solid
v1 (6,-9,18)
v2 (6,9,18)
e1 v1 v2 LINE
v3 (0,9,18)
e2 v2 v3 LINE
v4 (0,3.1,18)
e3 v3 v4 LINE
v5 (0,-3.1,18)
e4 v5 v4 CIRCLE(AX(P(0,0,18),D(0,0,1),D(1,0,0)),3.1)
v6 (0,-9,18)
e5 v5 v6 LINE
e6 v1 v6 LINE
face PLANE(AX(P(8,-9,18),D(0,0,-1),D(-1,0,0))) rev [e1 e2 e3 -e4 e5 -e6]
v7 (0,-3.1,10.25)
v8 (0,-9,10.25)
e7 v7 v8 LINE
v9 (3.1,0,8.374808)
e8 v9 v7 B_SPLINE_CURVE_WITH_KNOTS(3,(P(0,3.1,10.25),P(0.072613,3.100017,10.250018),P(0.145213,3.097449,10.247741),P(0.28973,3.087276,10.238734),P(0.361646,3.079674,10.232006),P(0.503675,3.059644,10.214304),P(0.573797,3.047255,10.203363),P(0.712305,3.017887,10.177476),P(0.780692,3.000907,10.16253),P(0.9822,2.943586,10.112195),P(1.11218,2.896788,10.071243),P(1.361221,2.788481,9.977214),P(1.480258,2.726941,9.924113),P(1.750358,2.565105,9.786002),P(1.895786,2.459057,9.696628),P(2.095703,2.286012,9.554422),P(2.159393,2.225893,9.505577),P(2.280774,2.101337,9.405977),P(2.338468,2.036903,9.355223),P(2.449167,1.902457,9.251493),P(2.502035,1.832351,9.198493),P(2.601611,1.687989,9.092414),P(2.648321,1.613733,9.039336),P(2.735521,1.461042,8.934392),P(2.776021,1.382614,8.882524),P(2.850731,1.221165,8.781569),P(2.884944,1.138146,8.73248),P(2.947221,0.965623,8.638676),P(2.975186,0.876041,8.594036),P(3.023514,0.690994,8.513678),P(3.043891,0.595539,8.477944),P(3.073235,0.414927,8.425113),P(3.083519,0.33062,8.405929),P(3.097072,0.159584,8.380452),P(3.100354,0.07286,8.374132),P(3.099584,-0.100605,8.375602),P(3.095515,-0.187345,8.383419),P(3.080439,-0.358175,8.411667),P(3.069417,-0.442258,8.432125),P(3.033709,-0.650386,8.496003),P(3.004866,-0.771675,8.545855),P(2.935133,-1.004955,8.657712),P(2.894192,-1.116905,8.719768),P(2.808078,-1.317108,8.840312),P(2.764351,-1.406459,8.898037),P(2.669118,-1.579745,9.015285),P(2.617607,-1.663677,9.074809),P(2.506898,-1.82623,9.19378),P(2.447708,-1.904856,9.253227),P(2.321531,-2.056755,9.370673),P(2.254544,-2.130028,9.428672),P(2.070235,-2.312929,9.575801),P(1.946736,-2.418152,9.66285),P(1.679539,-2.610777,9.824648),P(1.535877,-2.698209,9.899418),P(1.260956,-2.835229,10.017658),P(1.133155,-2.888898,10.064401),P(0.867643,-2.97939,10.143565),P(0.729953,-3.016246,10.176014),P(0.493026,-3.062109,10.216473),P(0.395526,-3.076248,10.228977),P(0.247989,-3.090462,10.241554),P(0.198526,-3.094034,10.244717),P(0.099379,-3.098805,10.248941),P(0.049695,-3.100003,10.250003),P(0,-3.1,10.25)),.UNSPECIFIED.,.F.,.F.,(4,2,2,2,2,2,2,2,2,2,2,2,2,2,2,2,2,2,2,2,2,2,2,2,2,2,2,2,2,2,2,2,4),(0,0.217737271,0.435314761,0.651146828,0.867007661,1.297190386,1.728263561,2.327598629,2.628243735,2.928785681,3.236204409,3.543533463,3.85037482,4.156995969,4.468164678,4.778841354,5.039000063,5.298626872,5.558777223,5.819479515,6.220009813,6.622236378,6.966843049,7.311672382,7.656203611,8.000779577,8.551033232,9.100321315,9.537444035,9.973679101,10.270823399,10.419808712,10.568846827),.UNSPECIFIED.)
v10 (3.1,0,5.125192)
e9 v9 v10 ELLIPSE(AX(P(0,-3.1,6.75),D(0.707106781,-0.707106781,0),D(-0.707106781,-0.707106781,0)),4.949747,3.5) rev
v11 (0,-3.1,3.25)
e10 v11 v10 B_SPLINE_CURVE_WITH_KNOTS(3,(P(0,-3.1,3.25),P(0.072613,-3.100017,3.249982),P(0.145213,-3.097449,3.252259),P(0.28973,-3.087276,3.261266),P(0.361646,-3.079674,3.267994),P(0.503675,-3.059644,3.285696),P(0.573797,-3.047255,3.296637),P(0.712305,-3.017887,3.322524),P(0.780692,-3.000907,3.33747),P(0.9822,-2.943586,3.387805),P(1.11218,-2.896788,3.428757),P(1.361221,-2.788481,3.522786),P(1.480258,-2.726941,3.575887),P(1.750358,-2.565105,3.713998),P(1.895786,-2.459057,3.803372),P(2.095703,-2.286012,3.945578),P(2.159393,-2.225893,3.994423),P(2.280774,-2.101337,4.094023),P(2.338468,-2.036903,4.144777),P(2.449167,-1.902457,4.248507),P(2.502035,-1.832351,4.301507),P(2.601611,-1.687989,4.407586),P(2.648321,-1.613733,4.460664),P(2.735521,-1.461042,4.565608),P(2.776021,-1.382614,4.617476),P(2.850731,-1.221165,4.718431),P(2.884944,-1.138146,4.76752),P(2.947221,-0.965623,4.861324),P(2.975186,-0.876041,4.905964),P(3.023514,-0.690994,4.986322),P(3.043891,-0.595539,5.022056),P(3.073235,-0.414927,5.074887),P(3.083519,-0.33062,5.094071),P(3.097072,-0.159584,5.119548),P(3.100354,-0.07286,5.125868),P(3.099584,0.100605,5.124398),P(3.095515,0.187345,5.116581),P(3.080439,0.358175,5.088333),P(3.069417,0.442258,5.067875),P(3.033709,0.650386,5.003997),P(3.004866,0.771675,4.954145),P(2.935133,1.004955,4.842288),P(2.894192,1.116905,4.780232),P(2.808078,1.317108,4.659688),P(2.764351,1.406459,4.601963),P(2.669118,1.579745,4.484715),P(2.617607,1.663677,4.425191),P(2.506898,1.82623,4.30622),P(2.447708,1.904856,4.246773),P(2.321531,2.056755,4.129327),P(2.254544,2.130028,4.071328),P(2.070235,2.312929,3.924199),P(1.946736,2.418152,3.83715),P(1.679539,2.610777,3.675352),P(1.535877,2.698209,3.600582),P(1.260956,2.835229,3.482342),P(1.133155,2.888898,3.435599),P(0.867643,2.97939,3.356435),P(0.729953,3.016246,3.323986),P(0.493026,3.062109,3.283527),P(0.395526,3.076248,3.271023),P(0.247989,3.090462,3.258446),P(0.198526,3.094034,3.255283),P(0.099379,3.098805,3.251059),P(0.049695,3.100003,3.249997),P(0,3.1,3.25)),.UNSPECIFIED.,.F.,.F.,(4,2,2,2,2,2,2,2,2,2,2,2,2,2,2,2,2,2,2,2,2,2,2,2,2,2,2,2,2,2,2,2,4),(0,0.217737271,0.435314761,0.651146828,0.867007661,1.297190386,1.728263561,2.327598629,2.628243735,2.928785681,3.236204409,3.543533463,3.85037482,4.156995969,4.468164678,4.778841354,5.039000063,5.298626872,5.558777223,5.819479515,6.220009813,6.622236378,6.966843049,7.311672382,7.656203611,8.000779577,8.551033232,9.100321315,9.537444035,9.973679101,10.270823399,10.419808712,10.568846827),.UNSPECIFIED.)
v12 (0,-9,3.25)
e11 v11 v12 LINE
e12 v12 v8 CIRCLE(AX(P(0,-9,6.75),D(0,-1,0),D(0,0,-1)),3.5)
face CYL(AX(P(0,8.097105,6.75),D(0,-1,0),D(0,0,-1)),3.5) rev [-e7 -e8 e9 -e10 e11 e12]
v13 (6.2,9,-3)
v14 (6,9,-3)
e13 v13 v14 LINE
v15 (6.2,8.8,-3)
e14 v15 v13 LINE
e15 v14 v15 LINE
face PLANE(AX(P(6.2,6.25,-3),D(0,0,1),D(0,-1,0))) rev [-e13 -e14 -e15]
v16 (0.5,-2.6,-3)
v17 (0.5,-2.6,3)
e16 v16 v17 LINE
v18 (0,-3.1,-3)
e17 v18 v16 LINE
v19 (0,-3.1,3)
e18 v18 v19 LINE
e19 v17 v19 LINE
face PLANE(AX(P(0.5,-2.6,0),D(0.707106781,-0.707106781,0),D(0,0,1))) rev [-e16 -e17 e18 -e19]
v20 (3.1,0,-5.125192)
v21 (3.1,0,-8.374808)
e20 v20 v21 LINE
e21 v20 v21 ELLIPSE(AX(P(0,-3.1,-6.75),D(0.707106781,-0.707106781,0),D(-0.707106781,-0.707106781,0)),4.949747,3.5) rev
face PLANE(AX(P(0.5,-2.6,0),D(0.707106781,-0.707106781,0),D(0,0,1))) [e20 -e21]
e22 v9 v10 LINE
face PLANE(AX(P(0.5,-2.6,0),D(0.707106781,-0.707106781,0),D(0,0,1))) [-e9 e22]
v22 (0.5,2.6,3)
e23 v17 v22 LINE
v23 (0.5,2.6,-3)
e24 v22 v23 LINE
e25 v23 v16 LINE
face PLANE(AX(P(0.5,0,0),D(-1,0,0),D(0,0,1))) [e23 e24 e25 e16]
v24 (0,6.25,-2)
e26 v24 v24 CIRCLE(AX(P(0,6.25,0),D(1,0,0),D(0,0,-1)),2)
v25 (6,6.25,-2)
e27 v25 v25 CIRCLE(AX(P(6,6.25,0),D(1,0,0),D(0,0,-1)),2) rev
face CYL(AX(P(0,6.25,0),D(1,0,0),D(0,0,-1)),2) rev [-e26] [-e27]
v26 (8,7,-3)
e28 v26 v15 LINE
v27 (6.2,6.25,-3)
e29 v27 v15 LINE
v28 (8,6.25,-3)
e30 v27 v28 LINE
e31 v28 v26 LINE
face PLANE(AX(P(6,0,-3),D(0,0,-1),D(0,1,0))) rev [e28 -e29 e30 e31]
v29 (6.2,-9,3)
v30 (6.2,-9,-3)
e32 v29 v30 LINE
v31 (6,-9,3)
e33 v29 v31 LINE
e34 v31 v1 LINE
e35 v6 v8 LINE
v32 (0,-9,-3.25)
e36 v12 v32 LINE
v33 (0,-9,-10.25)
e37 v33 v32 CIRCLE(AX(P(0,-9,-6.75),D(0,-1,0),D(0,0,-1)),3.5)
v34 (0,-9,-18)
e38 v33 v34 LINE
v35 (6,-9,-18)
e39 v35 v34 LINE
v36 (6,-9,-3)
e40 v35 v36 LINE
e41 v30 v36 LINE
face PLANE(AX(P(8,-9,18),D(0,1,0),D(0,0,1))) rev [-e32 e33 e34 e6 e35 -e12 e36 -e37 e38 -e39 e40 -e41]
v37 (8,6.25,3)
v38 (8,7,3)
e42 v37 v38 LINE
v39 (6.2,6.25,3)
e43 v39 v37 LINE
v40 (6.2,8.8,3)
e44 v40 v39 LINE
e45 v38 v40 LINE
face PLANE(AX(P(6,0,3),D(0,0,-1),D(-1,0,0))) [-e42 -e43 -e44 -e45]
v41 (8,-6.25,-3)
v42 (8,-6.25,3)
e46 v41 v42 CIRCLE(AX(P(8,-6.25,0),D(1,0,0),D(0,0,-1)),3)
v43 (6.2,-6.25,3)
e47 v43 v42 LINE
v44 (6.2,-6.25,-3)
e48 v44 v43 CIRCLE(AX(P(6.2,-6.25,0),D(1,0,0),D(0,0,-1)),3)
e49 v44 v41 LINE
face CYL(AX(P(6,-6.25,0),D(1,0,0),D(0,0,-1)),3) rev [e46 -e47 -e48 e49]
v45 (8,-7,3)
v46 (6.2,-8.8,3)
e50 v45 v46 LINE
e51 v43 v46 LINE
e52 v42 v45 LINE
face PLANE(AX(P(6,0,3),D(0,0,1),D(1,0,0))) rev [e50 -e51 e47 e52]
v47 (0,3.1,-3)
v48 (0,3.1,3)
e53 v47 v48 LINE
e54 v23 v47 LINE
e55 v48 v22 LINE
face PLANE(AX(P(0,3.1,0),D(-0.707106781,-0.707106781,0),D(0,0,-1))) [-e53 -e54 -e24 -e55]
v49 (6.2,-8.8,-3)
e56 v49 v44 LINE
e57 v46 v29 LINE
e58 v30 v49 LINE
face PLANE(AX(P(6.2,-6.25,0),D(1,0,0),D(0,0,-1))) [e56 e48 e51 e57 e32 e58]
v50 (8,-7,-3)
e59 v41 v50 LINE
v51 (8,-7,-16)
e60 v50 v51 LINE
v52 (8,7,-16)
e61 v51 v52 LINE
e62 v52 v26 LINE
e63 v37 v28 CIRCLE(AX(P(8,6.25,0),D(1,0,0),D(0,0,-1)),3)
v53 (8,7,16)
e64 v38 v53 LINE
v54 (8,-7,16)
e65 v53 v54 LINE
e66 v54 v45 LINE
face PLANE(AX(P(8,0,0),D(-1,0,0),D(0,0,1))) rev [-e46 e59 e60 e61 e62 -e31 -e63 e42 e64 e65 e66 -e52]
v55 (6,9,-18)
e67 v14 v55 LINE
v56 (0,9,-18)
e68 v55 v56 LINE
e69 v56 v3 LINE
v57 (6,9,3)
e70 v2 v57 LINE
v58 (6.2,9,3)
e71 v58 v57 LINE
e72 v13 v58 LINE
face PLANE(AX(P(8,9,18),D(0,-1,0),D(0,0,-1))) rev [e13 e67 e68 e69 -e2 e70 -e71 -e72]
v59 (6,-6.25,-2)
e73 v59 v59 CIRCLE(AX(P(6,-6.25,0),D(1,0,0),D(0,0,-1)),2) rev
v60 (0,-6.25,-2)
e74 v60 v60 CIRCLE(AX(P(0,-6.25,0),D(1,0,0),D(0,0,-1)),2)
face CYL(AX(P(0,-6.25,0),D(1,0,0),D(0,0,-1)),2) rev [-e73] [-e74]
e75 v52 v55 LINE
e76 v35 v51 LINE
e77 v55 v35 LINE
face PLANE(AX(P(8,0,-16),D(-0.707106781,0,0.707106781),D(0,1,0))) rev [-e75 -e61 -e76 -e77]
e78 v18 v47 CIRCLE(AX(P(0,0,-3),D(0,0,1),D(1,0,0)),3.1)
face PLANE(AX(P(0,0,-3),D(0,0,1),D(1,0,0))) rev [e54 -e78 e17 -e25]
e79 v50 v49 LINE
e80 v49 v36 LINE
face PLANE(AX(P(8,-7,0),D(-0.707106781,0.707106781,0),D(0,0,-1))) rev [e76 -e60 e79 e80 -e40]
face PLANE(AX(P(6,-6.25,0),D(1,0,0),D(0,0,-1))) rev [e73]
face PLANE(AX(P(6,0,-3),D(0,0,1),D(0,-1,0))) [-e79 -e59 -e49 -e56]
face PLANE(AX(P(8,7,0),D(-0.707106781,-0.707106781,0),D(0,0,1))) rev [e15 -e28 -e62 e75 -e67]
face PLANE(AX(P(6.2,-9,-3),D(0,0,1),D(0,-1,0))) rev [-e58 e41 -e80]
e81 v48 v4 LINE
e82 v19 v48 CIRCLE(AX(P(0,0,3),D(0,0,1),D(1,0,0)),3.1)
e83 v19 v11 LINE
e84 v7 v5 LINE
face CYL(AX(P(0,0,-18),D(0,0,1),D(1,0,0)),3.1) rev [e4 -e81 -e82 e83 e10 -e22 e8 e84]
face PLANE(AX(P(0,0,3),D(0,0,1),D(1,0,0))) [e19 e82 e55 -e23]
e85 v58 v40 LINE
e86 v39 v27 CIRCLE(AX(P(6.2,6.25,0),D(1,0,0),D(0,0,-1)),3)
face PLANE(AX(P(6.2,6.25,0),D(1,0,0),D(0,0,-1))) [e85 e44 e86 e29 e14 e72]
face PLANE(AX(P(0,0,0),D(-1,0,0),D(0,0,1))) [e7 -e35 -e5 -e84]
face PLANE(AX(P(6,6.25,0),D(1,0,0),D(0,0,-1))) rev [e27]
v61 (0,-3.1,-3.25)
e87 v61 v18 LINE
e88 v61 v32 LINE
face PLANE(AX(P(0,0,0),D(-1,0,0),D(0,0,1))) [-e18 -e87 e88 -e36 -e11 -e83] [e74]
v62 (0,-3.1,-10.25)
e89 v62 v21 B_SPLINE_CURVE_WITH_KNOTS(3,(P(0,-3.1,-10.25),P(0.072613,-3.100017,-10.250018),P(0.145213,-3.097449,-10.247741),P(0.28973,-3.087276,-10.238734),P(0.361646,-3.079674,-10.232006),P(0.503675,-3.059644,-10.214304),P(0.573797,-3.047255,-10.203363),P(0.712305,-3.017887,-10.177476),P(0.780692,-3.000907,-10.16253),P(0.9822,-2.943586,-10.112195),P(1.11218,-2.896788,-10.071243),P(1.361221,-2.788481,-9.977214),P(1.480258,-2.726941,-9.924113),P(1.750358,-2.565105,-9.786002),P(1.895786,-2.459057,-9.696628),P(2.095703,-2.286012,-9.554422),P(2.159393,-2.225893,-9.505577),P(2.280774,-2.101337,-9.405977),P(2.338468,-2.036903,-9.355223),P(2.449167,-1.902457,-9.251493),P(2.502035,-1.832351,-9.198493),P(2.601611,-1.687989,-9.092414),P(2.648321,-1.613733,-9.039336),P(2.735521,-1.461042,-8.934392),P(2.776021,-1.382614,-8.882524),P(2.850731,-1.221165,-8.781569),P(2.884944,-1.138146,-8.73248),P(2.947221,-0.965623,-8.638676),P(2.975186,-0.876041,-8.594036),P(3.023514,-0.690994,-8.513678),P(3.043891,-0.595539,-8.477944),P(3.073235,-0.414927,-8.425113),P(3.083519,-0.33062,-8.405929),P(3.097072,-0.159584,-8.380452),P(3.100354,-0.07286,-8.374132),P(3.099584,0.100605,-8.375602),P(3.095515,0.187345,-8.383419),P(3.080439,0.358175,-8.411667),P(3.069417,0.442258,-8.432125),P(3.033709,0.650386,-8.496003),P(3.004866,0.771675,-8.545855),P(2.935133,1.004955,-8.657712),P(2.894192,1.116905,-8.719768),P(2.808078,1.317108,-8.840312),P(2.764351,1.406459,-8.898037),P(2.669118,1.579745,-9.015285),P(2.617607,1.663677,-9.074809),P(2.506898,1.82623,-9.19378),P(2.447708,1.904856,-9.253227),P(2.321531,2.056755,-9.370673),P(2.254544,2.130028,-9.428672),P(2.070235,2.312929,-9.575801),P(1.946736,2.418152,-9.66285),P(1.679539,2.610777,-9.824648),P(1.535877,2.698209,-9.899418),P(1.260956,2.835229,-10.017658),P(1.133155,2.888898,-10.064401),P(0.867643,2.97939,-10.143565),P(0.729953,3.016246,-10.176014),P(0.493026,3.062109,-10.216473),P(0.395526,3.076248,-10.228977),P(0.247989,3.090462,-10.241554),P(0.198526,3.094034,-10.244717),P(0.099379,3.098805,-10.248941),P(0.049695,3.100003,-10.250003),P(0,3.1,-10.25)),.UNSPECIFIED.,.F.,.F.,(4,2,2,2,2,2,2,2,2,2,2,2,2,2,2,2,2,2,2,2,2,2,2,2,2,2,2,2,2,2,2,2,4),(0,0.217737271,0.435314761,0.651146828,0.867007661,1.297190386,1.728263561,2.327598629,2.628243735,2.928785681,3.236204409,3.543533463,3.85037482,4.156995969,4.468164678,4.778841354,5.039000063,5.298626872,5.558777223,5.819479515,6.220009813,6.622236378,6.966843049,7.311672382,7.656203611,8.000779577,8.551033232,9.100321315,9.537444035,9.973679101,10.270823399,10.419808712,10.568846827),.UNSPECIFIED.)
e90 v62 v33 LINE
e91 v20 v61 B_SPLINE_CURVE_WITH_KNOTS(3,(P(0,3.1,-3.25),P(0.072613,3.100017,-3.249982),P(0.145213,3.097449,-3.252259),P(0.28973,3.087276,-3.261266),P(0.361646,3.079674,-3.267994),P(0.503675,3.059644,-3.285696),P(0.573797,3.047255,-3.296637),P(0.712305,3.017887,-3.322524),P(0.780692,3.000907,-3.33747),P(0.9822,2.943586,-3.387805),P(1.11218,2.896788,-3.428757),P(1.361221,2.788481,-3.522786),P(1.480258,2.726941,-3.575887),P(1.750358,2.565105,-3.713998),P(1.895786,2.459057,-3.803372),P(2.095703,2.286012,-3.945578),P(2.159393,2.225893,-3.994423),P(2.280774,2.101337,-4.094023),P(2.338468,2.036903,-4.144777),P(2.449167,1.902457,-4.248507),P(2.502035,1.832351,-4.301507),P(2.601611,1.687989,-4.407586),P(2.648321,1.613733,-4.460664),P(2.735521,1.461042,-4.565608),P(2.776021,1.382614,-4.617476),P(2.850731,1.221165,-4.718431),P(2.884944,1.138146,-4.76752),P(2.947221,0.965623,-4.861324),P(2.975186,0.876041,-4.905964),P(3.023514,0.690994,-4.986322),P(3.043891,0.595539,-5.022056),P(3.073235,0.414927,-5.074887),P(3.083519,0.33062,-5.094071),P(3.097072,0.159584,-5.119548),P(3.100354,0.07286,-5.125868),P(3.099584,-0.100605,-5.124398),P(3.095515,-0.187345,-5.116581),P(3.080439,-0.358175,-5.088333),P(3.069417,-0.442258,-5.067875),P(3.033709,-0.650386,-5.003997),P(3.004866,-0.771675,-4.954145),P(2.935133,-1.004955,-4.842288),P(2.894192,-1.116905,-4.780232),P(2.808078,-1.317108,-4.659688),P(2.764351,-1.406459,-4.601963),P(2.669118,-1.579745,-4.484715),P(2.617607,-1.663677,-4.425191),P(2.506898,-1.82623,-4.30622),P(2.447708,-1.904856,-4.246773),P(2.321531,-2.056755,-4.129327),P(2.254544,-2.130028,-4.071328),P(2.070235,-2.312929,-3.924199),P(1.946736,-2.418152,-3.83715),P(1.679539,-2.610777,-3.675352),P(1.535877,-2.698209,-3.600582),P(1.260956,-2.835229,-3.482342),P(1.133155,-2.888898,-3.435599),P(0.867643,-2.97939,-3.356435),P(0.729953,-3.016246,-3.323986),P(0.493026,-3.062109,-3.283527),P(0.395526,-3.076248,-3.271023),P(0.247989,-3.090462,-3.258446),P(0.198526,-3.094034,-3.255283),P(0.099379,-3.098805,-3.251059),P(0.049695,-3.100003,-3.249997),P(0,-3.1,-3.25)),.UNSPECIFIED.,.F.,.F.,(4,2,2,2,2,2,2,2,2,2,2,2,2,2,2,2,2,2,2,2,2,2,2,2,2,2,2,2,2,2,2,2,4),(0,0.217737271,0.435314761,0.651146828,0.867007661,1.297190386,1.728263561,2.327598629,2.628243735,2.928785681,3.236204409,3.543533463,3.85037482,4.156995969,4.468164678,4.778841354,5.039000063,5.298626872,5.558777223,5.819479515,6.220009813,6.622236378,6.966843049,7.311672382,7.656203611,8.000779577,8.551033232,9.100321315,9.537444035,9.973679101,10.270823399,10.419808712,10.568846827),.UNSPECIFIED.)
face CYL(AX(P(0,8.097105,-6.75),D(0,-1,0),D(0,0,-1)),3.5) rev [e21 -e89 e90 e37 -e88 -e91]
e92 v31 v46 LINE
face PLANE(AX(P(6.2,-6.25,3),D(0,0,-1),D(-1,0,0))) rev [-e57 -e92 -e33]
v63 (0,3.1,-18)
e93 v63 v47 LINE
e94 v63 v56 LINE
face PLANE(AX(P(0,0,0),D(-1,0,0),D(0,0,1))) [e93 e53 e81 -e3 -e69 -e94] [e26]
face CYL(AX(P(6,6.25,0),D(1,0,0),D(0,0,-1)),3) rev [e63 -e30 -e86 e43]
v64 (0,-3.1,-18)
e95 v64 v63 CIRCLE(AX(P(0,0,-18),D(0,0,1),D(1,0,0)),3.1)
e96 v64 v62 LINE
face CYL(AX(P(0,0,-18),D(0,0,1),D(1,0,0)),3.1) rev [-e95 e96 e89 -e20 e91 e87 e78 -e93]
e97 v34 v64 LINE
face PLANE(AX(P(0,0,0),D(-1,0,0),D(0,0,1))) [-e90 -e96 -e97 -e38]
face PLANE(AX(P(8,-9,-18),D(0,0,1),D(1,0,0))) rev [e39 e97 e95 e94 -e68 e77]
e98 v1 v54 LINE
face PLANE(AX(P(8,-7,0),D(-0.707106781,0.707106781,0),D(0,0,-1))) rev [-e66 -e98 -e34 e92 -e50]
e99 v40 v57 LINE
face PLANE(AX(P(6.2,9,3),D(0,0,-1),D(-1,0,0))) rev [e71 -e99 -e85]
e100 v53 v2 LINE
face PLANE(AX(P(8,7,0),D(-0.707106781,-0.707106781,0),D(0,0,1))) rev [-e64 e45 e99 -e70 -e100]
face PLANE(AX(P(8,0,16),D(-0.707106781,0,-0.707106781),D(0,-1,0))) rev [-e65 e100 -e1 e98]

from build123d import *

# Parameters (mm, degrees)
SKETCH_1_W              = 36
SKETCH_1_H              = 18
EXTRUDE_1_DEPTH         = 8
CUT_EXTRUDE_1_DEPTH     = 38.960505792
CHAMFER_1_SIZE          = 2
CUT_EXTRUDE_2_DEPTH     = 22.656407828
CUT_EXTRUDE_START       = -2
CUT_EXTRUDE_3_OUTLINE_R = 2
CUT_EXTRUDE_3_DEPTH     = 2
EXTRUDE_2_DEPTH         = 0.2
EXTRUDE_3_DEPTH         = 3
SKETCH_7_W              = 6
SKETCH_7_H              = 6.2
CUT_EXTRUDE_4_DEPTH     = 0.5
CHAMFER_16_SIZE         = 0.5
CUT_EXTRUDE_5_REACH     = 28.683


# Read off the part's stored shape, not the designer's step: Вырез-Вытянуть3
with BuildPart() as part:
    # Эскиз1 → Бобышка-Вытянуть1 (new body)
    with BuildSketch(Plane(origin=(0, 0, 0), x_dir=(0, 0, -1), z_dir=(1, 0, 0))):
        Rectangle(SKETCH_1_W, SKETCH_1_H)
    extrude(amount=EXTRUDE_1_DEPTH)

    # Эскиз2 → Вырез-Вытянуть1 (cut, through all)
    with BuildSketch(Plane.XY.offset(18)):
        with BuildLine():
            ThreePointArc((0, -3.1), (3.1, 0), (0, 3.1))
            Line((0, 3.1), (0, -3.1))
        make_face()
    extrude(amount=-CUT_EXTRUDE_1_DEPTH, mode=Mode.SUBTRACT)

    # Фаска1
    chamfer_1_edges = [part.edges().sort_by_distance(p)[0] for p in [
        (8, 0, 18),
        (8, -9, 0),
        (8, 0, -18),
        (8, 9, 0),
    ]]
    chamfer(chamfer_1_edges, length=CHAMFER_1_SIZE)

    # Эскиз3 → Вырез-Вытянуть2 (cut, through all)
    with BuildSketch(Plane(origin=(8, 0, 0), x_dir=(0, 0, -1), z_dir=(1, 0, 0))):
        with BuildLine():
            ThreePointArc((1.413329403, 7), (1.552631161, 6.636440782), (1.6, 6.25))
            ThreePointArc((1.6, 6.25), (-0.386440782, 4.697368839), (-1.413329403, 7))
            Line((-1.413329403, 7), (-1.854049622, 7))
            ThreePointArc((-1.854049622, 7), (-0.382034525, 4.286826645), (2, 6.25))
            ThreePointArc((2, 6.25), (1.963173355, 6.632034525), (1.854049622, 7))
            Line((1.854049622, 7), (1.413329403, 7))
        make_face()
        with BuildLine():
            ThreePointArc((-1.413329403, 7), (0, 7.85), (1.413329403, 7))
            Line((1.413329403, 7), (1.854049622, 7))
            ThreePointArc((1.854049622, 7), (0, 8.25), (-1.854049622, 7))
            Line((-1.854049622, 7), (-1.413329403, 7))
        make_face()
        with BuildLine():
            ThreePointArc((-1.413329403, 7), (-0.386440782, 4.697368839), (1.6, 6.25))
            ThreePointArc((1.6, 6.25), (1.552631161, 6.636440782), (1.413329403, 7))
            Line((1.413329403, 7), (-1.413329403, 7))
        make_face()
        with BuildLine():
            Line((-1.413329403, 7), (1.413329403, 7))
            ThreePointArc((1.413329403, 7), (0, 7.85), (-1.413329403, 7))
        make_face()
        with BuildLine():
            ThreePointArc((-1.413329403, -7), (-0.386440782, -4.697368839), (1.6, -6.25))
            ThreePointArc((1.6, -6.25), (1.552631161, -6.636440782), (1.413329403, -7))
            Line((1.413329403, -7), (1.854049622, -7))
            ThreePointArc((1.854049622, -7), (1.963173355, -6.632034525), (2, -6.25))
            ThreePointArc((2, -6.25), (-0.382034525, -4.286826645), (-1.854049622, -7))
            Line((-1.854049622, -7), (-1.413329403, -7))
        make_face()
        with BuildLine():
            ThreePointArc((1.413329403, -7), (0, -7.85), (-1.413329403, -7))
            Line((-1.413329403, -7), (-1.854049622, -7))
            ThreePointArc((-1.854049622, -7), (0, -8.25), (1.854049622, -7))
            Line((1.854049622, -7), (1.413329403, -7))
        make_face()
        with BuildLine():
            ThreePointArc((1.413329403, -7), (1.552631161, -6.636440782), (1.6, -6.25))
            ThreePointArc((1.6, -6.25), (-0.386440782, -4.697368839), (-1.413329403, -7))
            Line((-1.413329403, -7), (1.413329403, -7))
        make_face()
        with BuildLine():
            Line((1.413329403, -7), (-1.413329403, -7))
            ThreePointArc((-1.413329403, -7), (0, -7.85), (1.413329403, -7))
        make_face()
    extrude(amount=-CUT_EXTRUDE_2_DEPTH, mode=Mode.SUBTRACT)

    # Вырез-Вытянуть3 outline → Вырез-Вытянуть3 (cut)
    # profile 1 of 2: a face of its own
    with BuildSketch(Plane(origin=(8, 0, 0), x_dir=(0, 0, -1), z_dir=(1, 0, 0)).offset(CUT_EXTRUDE_START)):
        with BuildLine():
            Line((-3, 9), (-3, 6.25))
            ThreePointArc((-3, 6.25), (0, 3.25), (3, 6.25))
            Line((3, 6.25), (3, 9))
            Line((3, 9), (-3, 9))
        make_face()
        with Locations((0, 6.25)):
            Circle(CUT_EXTRUDE_3_OUTLINE_R, mode=Mode.SUBTRACT)
    # profile 2 of 2: a face of its own
    with BuildSketch(Plane(origin=(8, 0, 0), x_dir=(0, 0, -1), z_dir=(1, 0, 0)).offset(CUT_EXTRUDE_START)):
        with BuildLine():
            Line((3, -9), (3, -6.25))
            ThreePointArc((3, -6.25), (0, -3.25), (-3, -6.25))
            Line((-3, -6.25), (-3, -9))
            Line((-3, -9), (3, -9))
        make_face()
        with Locations((0, -6.25)):
            Circle(CUT_EXTRUDE_3_OUTLINE_R, mode=Mode.SUBTRACT)
    extrude(amount=CUT_EXTRUDE_3_DEPTH, mode=Mode.SUBTRACT)

    # Эскиз5 → Бобышка-Вытянуть2 (add)
    with BuildSketch(Plane(origin=(6, 0, 0), x_dir=(0, 0, -1), z_dir=(1, 0, 0))):
        with BuildLine():
            Line((3, 9), (-3, 9))
            Line((-3, 9), (-3, 6.25))
            ThreePointArc((-3, 6.25), (0, 3.25), (3, 6.25))
            Line((3, 6.25), (3, 9))
        make_face()
        with BuildLine():
            Line((-3, -9), (3, -9))
            Line((3, -9), (3, -6.25))
            ThreePointArc((3, -6.25), (0, -3.25), (-3, -6.25))
            Line((-3, -6.25), (-3, -9))
        make_face()
    extrude(amount=EXTRUDE_2_DEPTH)

    # Эскиз6 → Бобышка-Вытянуть3 (add, symmetric)
    with BuildSketch(Plane.XY):
        with BuildLine():
            Line((0, 3.1), (0, -3.1))
            ThreePointArc((0, -3.1), (3.1, 0), (0, 3.1))
        make_face()
    extrude(amount=EXTRUDE_3_DEPTH, both=True)

    # Эскиз7 → Вырез-Вытянуть4 (cut, symmetric)
    with BuildSketch(Plane.ZY):
        Rectangle(SKETCH_7_W, SKETCH_7_H)
    extrude(amount=CUT_EXTRUDE_4_DEPTH, both=True, mode=Mode.SUBTRACT)

    # Фаска16
    # the kernel refuses this chamfer: 0.5 mm, written as the material it adds along each edge
    with BuildSketch(Plane(origin=(0.5, 3.1, 3), x_dir=(-0.9996219169112968, 0.027495876610586494, 0), z_dir=(0, 0, -1))) as chamfer_16_piece_1_section:
        Polygon((CHAMFER_16_SIZE * 0.999621916911, -CHAMFER_16_SIZE * 0.0274958766106), (-CHAMFER_16_SIZE * 0.0274958766106, -CHAMFER_16_SIZE * 0.999621916911), (0, 0), align=None)
    chamfer_16_piece_1 = extrude(amount=6, mode=Mode.PRIVATE)
    chamfer_16_piece_1 = split(chamfer_16_piece_1, bisect_by=Plane(origin=(0, 2.934797923, 0), z_dir=(1, 0, 0)), keep=Keep.TOP, mode=Mode.PRIVATE)
    add(chamfer_16_piece_1)
    with BuildSketch(Plane(origin=(0.5, -3.1, -3), x_dir=(-0.9996219169112968, -0.027495876610586494, 0), z_dir=(0, 0, 1))) as chamfer_16_piece_2_section:
        Polygon((CHAMFER_16_SIZE * 0.999621916911, -CHAMFER_16_SIZE * 0.0274958766106), (-CHAMFER_16_SIZE * 0.0274958766106, -CHAMFER_16_SIZE * 0.999621916911), (0, 0), align=None)
    chamfer_16_piece_2 = extrude(amount=6, mode=Mode.PRIVATE)
    chamfer_16_piece_2 = split(chamfer_16_piece_2, bisect_by=Plane(origin=(0, -2.934797923, 0), z_dir=(1, 0, 0)), keep=Keep.TOP, mode=Mode.PRIVATE)
    add(chamfer_16_piece_2)

    # Вырез-Вытянуть5: up to this plane
    cut_extrude_5_end = Plane(origin=(0.5, -2.6, 0), z_dir=(0.7071067811865525, -0.7071067811865426, 0))
    # Эскиз8 → Вырез-Вытянуть5 (cut, up to the surface)
    with BuildSketch(Plane.XZ.offset(9), mode=Mode.PRIVATE) as cut_extrude_5_sk1:
        with BuildLine():
            ThreePointArc((3.5, 6.75), (2.474873734, 9.224873734), (0, 10.25))
            Line((0, 10.25), (0, 3.25))
            ThreePointArc((0, 3.25), (2.474873734, 4.275126266), (3.5, 6.75))
        make_face()
    cut_extrude_5_tool1 = split(extrude(cut_extrude_5_sk1.sketch, amount=-CUT_EXTRUDE_5_REACH, mode=Mode.PRIVATE), bisect_by=cut_extrude_5_end, keep=Keep.BOTH, mode=Mode.PRIVATE)
    add(cut_extrude_5_tool1.solids().sort_by_distance((1.485446, -9, 6.75))[0], mode=Mode.SUBTRACT)
    # Эскиз8 → Вырез-Вытянуть5 (cut, up to the surface)
    with BuildSketch(Plane.XZ.offset(9), mode=Mode.PRIVATE) as cut_extrude_5_sk2:
        with BuildLine():
            Line((0, 3.25), (0, 10.25))
            ThreePointArc((0, 10.25), (-3.5, 6.75), (0, 3.25))
        make_face()
    cut_extrude_5_tool2 = split(extrude(cut_extrude_5_sk2.sketch, amount=-CUT_EXTRUDE_5_REACH, mode=Mode.PRIVATE), bisect_by=cut_extrude_5_end, keep=Keep.BOTH, mode=Mode.PRIVATE)
    add(cut_extrude_5_tool2.solids().sort_by_distance((-1.485446, -9, 6.75))[0], mode=Mode.SUBTRACT)
    # Эскиз8 → Вырез-Вытянуть5 (cut, up to the surface)
    with BuildSketch(Plane.XZ.offset(9), mode=Mode.PRIVATE) as cut_extrude_5_sk3:
        with BuildLine():
            ThreePointArc((3.5, -6.75), (2.474873734, -4.275126266), (0, -3.25))
            Line((0, -3.25), (0, -10.25))
            ThreePointArc((0, -10.25), (2.474873734, -9.224873734), (3.5, -6.75))
        make_face()
    cut_extrude_5_tool3 = split(extrude(cut_extrude_5_sk3.sketch, amount=-CUT_EXTRUDE_5_REACH, mode=Mode.PRIVATE), bisect_by=cut_extrude_5_end, keep=Keep.BOTH, mode=Mode.PRIVATE)
    add(cut_extrude_5_tool3.solids().sort_by_distance((1.485446, -9, -6.75))[0], mode=Mode.SUBTRACT)
    # Эскиз8 → Вырез-Вытянуть5 (cut, up to the surface)
    with BuildSketch(Plane.XZ.offset(9), mode=Mode.PRIVATE) as cut_extrude_5_sk4:
        with BuildLine():
            Line((0, -10.25), (0, -3.25))
            ThreePointArc((0, -3.25), (-3.5, -6.75), (0, -10.25))
        make_face()
    cut_extrude_5_tool4 = split(extrude(cut_extrude_5_sk4.sketch, amount=-CUT_EXTRUDE_5_REACH, mode=Mode.PRIVATE), bisect_by=cut_extrude_5_end, keep=Keep.BOTH, mode=Mode.PRIVATE)
    add(cut_extrude_5_tool4.solids().sort_by_distance((-1.485446, -9, -6.75))[0], mode=Mode.SUBTRACT)


solid = part.part
